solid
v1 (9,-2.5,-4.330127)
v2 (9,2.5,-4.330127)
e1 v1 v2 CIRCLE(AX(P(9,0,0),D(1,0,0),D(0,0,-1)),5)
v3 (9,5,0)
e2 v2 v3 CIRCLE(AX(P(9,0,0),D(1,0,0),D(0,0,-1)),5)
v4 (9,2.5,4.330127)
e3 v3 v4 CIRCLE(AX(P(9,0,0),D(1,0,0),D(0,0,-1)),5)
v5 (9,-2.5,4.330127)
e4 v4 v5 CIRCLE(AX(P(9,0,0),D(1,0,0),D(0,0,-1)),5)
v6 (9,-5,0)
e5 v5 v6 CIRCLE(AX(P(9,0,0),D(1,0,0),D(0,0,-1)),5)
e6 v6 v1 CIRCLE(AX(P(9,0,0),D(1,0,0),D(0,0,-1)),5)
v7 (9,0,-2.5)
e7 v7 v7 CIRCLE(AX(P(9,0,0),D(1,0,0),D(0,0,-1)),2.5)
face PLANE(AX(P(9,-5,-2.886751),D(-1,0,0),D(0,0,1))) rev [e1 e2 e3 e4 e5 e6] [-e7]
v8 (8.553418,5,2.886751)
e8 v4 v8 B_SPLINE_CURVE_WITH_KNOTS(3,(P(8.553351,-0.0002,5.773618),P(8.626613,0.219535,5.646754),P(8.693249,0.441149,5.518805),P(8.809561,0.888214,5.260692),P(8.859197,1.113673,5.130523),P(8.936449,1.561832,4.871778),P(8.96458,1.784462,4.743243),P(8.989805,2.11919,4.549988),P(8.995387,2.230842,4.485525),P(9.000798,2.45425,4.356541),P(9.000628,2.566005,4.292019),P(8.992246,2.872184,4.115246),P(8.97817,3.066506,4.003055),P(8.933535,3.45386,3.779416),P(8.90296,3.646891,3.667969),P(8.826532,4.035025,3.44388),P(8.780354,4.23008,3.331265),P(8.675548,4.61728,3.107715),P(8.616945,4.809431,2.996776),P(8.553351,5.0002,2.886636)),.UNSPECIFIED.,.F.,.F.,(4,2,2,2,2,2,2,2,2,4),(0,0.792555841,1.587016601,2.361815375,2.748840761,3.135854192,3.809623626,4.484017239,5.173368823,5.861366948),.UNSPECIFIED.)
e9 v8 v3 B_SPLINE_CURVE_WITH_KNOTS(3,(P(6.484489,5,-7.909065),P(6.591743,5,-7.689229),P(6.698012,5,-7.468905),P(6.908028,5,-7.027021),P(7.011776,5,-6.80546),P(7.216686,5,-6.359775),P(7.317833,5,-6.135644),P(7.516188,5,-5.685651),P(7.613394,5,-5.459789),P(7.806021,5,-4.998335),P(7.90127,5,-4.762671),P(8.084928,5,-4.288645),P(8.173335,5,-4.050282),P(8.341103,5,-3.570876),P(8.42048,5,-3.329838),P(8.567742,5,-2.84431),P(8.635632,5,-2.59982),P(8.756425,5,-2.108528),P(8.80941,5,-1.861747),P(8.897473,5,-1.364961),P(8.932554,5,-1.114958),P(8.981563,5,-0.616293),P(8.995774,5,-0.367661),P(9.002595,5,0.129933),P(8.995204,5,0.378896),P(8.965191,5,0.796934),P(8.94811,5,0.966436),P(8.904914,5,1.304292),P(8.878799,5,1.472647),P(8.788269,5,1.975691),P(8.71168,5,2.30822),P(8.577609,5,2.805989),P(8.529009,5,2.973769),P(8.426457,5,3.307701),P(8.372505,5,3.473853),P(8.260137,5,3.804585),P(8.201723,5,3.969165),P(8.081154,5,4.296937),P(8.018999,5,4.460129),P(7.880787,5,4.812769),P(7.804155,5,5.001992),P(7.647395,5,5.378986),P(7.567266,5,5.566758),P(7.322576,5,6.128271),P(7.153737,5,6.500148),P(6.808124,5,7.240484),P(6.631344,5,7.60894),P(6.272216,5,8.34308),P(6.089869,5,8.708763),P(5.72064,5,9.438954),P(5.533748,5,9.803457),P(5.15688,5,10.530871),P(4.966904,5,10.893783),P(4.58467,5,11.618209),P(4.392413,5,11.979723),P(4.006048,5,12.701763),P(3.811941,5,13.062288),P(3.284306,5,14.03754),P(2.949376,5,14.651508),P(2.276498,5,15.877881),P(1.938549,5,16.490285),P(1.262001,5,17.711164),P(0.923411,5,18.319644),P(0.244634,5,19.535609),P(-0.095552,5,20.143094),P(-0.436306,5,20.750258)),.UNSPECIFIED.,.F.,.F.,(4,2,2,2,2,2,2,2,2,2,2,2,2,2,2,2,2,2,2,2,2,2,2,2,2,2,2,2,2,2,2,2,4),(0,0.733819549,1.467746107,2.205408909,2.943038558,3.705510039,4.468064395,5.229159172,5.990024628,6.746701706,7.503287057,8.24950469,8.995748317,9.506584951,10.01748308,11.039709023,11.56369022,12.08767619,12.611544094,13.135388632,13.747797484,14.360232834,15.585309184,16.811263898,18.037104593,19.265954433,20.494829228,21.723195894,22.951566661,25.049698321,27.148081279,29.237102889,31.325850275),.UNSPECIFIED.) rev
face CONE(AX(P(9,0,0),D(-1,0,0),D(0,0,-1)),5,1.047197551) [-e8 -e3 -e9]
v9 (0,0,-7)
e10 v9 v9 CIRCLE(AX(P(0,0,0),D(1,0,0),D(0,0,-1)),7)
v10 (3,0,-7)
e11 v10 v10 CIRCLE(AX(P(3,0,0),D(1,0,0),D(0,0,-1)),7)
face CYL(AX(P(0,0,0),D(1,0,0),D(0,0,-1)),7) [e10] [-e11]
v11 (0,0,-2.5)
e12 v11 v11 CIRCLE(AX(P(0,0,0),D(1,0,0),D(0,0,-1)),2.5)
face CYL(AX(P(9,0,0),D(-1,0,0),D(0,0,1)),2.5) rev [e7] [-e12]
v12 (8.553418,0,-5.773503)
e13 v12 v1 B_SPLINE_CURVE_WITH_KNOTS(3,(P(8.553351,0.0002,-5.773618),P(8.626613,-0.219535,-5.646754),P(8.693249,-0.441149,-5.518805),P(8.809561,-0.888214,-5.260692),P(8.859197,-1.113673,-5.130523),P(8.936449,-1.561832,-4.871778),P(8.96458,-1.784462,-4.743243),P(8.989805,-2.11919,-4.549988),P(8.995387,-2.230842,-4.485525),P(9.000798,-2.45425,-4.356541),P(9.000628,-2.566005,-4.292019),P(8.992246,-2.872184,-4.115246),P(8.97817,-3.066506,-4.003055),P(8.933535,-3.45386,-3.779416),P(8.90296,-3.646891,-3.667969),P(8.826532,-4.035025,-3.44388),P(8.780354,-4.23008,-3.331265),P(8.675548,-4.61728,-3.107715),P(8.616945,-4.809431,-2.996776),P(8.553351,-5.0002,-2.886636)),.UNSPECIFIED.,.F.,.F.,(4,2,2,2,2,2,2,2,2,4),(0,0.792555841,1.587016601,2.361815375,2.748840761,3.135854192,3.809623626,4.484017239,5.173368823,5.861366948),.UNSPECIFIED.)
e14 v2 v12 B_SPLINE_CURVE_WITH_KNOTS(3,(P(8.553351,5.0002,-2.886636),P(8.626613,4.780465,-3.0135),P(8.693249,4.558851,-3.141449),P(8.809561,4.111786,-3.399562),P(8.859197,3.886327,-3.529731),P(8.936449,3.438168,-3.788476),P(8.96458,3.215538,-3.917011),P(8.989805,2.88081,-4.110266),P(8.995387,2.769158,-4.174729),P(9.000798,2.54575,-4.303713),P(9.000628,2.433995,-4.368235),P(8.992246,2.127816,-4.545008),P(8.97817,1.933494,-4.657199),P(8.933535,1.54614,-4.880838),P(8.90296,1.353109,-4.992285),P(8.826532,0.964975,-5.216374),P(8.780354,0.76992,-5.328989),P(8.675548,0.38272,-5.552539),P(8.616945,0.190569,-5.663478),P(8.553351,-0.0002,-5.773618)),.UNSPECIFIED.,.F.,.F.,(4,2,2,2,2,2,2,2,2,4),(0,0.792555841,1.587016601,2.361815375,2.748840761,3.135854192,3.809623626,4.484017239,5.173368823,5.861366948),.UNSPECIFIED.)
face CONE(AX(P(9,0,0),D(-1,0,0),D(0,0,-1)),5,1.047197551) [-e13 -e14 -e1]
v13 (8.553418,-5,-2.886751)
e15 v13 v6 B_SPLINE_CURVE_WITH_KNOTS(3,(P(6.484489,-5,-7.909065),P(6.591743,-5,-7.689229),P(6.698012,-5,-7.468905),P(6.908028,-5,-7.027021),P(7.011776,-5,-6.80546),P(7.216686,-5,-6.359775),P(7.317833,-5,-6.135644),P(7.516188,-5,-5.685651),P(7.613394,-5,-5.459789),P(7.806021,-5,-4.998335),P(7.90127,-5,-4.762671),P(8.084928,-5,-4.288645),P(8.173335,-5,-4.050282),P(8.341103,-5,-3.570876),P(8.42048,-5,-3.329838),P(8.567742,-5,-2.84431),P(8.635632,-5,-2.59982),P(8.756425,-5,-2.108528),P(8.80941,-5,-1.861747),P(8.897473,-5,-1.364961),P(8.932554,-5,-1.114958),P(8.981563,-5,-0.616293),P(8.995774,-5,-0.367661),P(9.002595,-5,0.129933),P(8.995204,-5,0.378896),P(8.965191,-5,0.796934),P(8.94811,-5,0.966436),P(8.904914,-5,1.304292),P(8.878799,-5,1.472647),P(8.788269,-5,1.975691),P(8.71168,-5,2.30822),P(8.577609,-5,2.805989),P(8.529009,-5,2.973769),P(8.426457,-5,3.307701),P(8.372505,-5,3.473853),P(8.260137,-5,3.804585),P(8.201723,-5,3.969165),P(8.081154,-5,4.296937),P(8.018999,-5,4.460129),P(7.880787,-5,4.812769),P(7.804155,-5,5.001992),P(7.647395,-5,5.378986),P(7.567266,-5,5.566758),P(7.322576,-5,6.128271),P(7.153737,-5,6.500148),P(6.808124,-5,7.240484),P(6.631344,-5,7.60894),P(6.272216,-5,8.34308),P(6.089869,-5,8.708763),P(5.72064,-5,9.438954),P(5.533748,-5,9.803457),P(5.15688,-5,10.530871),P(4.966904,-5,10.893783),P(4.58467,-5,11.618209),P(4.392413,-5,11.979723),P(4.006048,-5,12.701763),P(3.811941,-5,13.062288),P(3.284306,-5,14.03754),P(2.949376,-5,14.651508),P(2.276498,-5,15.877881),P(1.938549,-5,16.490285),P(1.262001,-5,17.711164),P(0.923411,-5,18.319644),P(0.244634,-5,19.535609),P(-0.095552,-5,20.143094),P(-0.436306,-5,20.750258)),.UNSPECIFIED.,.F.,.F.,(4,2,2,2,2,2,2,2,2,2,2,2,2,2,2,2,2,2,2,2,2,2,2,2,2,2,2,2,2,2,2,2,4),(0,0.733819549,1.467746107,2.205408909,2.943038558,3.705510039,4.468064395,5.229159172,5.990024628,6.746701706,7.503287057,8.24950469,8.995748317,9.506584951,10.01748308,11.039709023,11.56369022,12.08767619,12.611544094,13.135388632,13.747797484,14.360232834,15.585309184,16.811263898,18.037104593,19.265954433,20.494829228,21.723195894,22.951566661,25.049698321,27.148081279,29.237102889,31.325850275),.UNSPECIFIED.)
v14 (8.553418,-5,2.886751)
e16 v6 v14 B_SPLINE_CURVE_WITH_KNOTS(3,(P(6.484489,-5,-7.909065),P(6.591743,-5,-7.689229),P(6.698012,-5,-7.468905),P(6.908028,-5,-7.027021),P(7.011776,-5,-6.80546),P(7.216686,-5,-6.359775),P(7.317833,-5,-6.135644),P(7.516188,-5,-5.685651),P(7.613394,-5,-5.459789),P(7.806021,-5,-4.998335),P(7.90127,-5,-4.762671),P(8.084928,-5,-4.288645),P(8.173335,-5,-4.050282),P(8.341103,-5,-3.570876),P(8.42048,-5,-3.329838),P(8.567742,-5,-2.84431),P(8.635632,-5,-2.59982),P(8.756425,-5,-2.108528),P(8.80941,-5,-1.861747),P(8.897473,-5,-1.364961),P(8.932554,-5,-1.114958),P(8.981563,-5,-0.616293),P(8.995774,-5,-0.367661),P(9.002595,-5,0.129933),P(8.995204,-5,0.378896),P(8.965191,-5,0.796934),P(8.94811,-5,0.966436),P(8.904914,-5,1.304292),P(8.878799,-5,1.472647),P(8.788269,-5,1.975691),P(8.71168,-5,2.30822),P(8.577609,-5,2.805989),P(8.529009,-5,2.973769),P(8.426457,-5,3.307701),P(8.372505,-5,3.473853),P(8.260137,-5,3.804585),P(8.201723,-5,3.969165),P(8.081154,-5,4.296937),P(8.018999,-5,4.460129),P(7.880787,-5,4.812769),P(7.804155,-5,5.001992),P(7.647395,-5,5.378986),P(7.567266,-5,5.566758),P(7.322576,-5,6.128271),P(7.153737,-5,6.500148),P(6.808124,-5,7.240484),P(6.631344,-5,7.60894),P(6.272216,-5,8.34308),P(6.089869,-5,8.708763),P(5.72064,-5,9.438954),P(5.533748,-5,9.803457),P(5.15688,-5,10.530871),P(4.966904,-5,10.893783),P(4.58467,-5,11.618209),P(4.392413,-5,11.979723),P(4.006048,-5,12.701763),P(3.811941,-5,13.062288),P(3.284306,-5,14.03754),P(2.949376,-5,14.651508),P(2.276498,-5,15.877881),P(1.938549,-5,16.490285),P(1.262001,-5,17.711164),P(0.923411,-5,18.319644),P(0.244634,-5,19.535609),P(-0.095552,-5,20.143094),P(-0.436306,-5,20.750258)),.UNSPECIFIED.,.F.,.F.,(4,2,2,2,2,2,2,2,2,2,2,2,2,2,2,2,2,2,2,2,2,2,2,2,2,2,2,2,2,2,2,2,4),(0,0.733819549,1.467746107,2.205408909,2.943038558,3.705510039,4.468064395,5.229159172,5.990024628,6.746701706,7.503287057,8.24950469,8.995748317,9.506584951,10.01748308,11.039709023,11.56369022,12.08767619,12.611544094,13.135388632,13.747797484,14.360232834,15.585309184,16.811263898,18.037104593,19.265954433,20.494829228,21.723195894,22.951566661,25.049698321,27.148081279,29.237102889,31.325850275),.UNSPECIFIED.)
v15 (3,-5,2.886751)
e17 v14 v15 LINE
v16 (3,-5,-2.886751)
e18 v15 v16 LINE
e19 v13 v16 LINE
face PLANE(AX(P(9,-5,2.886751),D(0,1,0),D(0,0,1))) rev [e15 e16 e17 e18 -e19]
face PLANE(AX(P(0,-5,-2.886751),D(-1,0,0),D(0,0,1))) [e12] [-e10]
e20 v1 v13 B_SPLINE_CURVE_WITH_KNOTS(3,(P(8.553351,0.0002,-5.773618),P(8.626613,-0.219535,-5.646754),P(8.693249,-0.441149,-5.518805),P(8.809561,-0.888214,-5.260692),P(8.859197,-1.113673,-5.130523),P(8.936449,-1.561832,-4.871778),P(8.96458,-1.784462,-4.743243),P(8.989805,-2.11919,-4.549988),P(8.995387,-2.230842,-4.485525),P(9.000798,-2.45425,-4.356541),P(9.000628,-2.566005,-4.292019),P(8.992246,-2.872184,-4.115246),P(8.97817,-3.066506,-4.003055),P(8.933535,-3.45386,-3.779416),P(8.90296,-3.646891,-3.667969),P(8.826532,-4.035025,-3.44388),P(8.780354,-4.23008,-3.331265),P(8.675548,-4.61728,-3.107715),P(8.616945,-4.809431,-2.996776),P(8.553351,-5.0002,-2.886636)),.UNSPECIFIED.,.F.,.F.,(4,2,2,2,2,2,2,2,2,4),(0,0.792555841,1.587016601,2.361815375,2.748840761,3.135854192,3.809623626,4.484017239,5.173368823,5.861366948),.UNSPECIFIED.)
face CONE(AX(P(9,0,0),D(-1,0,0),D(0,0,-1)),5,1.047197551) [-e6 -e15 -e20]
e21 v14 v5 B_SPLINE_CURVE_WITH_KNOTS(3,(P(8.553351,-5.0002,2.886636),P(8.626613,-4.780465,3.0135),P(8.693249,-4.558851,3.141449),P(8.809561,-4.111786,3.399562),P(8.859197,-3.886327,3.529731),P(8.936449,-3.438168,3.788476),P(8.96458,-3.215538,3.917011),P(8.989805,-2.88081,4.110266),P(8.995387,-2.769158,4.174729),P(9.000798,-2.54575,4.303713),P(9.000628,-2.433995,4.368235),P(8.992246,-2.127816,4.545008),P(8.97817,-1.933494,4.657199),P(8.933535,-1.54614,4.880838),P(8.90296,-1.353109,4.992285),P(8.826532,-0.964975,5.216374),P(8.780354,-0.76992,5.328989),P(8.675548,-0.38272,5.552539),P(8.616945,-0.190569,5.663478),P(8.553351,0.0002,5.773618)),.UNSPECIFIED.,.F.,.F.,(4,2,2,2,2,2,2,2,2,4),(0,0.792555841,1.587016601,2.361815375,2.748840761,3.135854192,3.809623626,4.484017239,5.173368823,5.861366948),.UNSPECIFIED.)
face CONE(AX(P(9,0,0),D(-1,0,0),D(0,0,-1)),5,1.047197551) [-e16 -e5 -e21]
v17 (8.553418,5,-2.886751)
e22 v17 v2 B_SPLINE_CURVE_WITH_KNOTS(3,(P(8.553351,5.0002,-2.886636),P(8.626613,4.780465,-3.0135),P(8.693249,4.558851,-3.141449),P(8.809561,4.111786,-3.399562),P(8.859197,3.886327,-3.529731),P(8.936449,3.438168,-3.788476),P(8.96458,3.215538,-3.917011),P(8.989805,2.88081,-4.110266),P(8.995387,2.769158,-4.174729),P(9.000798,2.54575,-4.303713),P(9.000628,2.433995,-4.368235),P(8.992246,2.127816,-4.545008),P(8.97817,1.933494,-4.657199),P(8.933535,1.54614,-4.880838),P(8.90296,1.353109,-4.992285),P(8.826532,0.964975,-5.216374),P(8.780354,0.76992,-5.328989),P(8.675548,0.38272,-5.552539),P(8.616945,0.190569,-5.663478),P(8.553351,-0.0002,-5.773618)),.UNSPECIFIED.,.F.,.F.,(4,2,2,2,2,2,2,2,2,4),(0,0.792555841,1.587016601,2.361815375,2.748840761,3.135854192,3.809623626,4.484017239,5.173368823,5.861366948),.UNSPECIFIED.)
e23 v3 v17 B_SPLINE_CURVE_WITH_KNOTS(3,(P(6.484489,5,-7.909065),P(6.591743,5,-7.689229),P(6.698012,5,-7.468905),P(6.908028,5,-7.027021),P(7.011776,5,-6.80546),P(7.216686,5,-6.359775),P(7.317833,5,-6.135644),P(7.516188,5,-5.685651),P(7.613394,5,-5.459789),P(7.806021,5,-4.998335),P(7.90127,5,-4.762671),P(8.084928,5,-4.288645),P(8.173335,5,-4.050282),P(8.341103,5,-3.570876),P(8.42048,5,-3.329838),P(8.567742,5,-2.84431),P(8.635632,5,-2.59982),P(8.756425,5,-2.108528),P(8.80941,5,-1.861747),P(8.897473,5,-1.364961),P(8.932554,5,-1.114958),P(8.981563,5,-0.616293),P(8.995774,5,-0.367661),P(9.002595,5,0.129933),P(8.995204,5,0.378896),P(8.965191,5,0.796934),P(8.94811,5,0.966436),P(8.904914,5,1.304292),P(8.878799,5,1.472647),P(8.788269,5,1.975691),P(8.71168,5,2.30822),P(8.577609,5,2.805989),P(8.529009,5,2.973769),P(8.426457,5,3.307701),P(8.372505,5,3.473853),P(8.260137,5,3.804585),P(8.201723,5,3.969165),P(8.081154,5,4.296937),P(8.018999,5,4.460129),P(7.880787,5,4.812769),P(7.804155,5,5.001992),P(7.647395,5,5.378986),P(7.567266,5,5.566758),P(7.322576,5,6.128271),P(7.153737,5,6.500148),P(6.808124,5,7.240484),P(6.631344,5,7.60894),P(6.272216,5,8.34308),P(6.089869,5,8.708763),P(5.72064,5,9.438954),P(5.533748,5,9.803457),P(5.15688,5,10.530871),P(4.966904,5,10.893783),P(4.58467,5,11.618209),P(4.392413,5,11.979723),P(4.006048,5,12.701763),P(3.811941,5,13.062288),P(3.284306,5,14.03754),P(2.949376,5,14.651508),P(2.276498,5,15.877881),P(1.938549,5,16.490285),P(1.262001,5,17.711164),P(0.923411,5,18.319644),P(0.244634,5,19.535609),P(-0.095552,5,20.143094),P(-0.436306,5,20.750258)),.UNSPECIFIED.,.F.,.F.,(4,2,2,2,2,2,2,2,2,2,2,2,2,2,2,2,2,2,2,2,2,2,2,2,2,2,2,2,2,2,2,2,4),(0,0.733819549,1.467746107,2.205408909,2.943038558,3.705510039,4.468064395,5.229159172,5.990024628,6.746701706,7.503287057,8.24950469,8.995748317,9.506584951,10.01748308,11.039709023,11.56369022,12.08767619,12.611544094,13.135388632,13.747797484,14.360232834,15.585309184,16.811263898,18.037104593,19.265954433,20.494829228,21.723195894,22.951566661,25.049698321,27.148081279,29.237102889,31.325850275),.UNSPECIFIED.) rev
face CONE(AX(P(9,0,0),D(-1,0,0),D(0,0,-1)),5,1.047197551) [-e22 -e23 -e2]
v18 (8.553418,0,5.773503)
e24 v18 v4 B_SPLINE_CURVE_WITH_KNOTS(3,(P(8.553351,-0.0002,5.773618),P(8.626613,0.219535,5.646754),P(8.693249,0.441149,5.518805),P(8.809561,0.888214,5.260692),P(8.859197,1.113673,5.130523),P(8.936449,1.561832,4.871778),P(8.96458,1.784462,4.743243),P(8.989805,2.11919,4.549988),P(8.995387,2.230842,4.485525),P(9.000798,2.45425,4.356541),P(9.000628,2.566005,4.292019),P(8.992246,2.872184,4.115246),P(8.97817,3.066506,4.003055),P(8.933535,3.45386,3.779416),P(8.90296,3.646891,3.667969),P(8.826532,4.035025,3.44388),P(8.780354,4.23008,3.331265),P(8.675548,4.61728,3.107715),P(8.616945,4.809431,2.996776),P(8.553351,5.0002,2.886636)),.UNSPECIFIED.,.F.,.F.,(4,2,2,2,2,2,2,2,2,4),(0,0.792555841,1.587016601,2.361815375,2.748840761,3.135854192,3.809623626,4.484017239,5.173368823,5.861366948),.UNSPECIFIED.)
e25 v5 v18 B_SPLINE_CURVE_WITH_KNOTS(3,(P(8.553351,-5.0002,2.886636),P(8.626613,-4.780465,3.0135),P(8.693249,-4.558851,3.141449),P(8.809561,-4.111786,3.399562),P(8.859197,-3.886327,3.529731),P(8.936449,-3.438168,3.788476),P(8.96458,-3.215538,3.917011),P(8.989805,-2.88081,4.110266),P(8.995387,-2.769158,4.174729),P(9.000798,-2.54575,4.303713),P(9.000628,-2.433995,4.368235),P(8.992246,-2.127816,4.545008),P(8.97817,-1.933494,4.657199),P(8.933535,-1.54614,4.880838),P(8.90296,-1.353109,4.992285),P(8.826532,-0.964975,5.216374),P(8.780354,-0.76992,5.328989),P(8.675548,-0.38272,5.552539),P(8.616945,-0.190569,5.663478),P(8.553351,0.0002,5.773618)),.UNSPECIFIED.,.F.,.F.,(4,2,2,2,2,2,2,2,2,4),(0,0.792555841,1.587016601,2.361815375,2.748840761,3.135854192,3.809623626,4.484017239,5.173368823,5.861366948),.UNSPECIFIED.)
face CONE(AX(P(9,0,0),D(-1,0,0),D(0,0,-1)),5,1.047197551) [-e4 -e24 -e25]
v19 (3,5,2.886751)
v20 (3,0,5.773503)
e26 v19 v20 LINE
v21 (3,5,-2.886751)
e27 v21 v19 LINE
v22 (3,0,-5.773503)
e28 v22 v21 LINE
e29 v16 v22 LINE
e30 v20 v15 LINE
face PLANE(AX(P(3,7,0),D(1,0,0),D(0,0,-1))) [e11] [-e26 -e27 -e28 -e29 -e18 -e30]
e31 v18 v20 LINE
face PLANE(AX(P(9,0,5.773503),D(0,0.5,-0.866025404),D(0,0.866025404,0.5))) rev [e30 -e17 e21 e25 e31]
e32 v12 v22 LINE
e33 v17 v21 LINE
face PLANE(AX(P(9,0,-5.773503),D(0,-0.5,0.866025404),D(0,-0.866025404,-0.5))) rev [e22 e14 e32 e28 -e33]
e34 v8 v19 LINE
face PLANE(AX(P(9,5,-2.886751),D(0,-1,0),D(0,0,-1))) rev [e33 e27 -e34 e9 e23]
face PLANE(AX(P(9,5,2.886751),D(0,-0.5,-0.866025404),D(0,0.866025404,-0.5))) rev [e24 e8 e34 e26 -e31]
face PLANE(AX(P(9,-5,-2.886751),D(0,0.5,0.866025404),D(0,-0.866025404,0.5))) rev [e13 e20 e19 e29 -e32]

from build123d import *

# Parameters (mm, degrees)
SKETCH1_R      = 2.5
EXTRUDE1_DEPTH = 9
SKETCH3_W      = 3
SKETCH3_H      = 4.5


# Read off the part's stored shape, not the designer's step: Cut-Extrude1
with BuildPart() as part:
    # Sketch1 → Extrude1 (new body)
    with BuildSketch(Plane(origin=(0, 0, 0), x_dir=(0, 0, -1), z_dir=(1, 0, 0))):
        Polygon((5.773502692, 0), (2.886751346, 5), (-2.886751346, 5), (-5.773502692, 0), (-2.886751346, -5), (2.886751346, -5), align=None)
        Circle(SKETCH1_R, mode=Mode.SUBTRACT)
    extrude(amount=EXTRUDE1_DEPTH)

    # Cut-Extrude1 outline → Cut-Extrude1 (revolve, cut)
    with BuildSketch(Plane.YX):
        Polygon((5.773502692, 9.000000845), (4.99999886, 9.000000845), (5.773502688, 8.553418015), align=None)
    revolve(axis=Axis((0, 0, 0), (1, 0, 0)), mode=Mode.SUBTRACT)

    # Sketch3 → Revolve1 (revolve)
    with BuildSketch(Plane.XY, mode=Mode.PRIVATE) as revolve1_sk:
        with Locations((1.5, 4.75)):
            Rectangle(SKETCH3_W, SKETCH3_H)
    revolve(revolve1_sk.sketch.rotate(Axis((0, 0, 0), (-1, 0, 0)), 90), axis=Axis((0, 0, 0), (-1, 0, 0)))


solid = part.part
